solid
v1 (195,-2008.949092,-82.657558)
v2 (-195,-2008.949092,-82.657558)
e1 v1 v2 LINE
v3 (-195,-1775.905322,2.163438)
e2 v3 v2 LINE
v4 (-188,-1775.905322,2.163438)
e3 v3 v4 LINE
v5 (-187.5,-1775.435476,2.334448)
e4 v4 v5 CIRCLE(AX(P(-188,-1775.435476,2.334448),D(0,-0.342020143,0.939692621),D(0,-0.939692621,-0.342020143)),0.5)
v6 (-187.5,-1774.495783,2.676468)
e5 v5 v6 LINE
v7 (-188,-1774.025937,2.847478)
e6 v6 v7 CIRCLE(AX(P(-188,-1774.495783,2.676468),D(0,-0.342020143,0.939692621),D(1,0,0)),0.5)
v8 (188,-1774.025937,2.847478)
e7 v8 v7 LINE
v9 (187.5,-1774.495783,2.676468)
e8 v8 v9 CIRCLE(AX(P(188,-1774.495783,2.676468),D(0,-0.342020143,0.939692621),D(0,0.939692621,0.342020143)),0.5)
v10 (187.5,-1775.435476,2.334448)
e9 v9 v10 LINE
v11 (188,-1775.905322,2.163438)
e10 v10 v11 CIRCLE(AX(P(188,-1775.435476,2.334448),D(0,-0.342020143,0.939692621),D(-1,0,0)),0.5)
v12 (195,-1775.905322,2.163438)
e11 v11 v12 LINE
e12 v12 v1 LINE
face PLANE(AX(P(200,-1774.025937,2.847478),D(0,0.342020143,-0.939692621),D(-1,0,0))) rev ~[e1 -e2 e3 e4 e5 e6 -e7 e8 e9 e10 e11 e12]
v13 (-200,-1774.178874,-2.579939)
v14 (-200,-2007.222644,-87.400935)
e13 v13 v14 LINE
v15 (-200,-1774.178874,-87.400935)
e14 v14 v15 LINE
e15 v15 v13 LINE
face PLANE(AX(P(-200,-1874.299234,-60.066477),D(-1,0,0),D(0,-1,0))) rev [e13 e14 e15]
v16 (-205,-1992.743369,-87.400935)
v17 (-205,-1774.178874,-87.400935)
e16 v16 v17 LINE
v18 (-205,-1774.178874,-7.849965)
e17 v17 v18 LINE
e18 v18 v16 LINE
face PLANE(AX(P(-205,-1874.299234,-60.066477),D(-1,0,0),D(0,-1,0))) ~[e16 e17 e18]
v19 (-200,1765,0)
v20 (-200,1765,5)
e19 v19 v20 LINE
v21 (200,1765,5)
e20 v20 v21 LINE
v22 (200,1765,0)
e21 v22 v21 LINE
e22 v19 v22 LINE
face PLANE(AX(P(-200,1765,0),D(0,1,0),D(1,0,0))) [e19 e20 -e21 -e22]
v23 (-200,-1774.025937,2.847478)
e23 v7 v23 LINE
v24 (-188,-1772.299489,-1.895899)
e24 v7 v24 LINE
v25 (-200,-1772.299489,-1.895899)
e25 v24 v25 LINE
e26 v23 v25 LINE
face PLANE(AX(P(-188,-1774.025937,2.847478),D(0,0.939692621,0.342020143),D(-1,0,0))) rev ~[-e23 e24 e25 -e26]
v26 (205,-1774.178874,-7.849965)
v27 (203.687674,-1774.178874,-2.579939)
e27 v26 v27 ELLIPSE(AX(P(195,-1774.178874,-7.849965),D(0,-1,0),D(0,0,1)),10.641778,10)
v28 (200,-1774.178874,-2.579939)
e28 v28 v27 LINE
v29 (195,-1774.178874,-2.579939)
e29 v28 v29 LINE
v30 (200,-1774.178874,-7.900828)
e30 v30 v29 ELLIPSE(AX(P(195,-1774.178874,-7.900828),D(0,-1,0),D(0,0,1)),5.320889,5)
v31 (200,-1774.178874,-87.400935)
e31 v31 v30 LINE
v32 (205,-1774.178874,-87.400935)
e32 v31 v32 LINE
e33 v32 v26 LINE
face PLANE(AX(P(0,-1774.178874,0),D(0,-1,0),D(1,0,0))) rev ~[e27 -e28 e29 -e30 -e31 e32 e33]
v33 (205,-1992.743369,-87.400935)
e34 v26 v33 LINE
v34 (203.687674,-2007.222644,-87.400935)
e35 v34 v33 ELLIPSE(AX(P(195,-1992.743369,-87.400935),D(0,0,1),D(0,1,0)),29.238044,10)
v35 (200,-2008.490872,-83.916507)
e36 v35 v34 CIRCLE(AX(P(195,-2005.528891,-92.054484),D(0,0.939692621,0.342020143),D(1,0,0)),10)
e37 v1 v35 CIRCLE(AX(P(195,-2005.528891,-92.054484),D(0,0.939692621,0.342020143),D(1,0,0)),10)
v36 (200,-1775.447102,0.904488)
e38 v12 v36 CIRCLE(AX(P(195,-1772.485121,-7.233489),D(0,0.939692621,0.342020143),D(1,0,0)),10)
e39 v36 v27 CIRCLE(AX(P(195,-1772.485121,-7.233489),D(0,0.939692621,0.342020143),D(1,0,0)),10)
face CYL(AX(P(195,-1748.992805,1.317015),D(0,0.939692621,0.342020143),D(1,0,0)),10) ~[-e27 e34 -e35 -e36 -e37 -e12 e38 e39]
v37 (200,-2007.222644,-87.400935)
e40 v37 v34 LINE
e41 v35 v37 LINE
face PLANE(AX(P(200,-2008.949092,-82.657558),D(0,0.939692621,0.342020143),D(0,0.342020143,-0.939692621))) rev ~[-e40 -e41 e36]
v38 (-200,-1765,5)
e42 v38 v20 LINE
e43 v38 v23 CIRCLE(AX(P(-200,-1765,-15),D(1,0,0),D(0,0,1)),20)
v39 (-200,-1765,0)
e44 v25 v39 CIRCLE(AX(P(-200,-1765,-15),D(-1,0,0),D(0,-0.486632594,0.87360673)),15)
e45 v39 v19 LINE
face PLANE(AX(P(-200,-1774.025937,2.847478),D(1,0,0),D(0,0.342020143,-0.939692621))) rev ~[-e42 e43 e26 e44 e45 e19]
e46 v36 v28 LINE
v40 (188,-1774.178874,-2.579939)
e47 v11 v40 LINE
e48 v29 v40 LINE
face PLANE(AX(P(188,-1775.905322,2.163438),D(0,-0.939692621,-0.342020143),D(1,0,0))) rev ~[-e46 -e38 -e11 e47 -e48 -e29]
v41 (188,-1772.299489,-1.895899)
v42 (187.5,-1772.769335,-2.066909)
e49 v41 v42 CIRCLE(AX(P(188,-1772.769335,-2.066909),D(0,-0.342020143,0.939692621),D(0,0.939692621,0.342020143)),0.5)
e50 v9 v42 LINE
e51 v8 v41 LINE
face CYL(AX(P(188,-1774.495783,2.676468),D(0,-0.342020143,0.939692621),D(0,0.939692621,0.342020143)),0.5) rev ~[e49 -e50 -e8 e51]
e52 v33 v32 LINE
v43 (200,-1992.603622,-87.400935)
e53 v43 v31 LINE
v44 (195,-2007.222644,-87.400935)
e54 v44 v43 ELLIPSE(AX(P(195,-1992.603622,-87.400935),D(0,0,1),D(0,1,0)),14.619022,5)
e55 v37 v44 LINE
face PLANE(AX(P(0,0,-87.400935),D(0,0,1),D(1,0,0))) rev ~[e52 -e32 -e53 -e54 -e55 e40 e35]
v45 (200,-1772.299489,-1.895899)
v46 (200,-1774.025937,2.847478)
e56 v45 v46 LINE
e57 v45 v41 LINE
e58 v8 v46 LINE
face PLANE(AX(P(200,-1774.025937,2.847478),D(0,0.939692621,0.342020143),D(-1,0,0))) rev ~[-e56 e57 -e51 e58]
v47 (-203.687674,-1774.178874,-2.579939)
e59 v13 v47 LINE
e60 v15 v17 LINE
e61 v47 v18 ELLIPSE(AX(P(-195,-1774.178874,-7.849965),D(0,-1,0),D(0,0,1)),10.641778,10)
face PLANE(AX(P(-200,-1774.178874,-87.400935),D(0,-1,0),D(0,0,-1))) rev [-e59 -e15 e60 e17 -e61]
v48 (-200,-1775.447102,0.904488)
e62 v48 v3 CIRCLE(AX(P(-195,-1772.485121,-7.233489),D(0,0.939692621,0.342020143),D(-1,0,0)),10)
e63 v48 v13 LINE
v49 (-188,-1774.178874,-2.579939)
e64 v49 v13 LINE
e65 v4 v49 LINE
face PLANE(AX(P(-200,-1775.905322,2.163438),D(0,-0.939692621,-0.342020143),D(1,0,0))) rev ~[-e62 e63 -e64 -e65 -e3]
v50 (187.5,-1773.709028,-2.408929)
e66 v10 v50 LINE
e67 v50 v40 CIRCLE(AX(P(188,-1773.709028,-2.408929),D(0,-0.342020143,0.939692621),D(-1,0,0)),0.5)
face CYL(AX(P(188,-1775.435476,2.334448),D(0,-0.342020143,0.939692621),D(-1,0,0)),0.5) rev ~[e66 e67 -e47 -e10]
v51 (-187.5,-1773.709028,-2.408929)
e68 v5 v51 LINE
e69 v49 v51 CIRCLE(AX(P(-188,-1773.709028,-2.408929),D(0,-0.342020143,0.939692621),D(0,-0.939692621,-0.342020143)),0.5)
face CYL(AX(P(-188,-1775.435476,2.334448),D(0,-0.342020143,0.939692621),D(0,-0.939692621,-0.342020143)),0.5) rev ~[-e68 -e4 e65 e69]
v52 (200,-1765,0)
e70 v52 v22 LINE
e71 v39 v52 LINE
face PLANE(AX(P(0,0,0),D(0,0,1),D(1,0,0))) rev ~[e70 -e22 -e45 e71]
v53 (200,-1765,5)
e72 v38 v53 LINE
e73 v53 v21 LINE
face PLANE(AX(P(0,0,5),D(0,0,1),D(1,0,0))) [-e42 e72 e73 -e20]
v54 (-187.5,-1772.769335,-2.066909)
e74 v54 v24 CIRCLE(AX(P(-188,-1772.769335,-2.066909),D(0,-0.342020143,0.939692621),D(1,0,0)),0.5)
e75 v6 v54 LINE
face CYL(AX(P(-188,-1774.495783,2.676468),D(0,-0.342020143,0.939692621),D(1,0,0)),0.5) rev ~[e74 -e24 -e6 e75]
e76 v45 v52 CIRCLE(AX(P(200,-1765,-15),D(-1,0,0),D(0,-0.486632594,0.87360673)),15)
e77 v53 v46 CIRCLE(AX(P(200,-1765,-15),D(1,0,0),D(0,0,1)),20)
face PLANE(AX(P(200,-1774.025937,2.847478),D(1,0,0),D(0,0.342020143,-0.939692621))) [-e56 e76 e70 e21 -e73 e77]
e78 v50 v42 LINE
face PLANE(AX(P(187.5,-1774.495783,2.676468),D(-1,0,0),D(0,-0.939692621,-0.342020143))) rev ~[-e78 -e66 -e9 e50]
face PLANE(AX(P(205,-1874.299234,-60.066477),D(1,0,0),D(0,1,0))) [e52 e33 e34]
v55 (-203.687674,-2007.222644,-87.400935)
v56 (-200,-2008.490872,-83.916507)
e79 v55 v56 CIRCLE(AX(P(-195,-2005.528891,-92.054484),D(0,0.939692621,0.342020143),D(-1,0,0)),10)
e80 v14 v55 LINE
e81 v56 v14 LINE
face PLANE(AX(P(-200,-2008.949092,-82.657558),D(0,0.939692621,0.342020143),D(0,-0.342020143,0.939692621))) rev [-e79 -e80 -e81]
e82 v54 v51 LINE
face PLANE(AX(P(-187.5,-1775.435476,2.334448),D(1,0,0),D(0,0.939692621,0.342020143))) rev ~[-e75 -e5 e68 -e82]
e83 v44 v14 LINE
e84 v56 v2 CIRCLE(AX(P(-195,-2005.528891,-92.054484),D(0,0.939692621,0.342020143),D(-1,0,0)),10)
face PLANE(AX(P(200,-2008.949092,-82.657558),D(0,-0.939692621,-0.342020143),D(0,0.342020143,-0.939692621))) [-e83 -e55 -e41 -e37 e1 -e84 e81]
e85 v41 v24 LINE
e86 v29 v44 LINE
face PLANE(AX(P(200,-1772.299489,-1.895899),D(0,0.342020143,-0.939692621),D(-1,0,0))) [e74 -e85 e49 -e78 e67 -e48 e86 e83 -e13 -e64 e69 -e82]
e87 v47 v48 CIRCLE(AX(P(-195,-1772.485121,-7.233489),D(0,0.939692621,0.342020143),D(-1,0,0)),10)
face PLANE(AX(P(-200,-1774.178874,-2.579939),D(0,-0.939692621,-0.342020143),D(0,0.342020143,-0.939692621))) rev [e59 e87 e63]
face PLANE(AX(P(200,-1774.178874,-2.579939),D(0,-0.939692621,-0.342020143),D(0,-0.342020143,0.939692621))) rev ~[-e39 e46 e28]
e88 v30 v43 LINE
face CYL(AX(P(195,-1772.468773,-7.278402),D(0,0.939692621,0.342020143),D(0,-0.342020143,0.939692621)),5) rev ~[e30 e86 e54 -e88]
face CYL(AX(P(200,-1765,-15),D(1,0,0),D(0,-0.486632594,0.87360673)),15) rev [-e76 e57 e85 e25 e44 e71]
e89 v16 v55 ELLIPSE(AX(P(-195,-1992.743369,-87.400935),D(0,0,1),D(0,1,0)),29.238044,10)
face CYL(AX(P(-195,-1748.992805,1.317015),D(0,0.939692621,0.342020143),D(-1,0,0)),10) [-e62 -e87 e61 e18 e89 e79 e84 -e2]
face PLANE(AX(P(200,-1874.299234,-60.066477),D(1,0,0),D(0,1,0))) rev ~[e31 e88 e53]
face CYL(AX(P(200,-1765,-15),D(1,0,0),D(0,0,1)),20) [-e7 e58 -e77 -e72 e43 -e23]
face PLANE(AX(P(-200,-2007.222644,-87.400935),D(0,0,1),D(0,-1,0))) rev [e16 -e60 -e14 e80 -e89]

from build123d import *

# Parameters (mm, degrees)
F0_W         = 400
F0_H         = 3530
F1_DEPTH     = 5
F3_DEPTH     = 400
F4_DEPTH     = 250
F6_DEPTH     = 1295.2249255895
F8_DEPTH     = 5
F9_T4_DEPTH  = 298
F9_T9_DEPTH  = 298
F10_T4_DEPTH = 248


# Not quite as in the source:
# - a fillet or chamfer that OpenCascade refuses, or shapes differently, is made with other operations: its cross-section is extruded or revolved along the edge and cut away or added
# - a pattern or mirror of a feature is missing from the dataset's text; its kind, count and spacing are read off the source's solid


with BuildPart() as f1:
    # F0 (on Top) → F1 (new body)
    with BuildSketch(Plane.XY):
        Rectangle(F0_W, F0_H)
    extrude(amount=F1_DEPTH)

    # F2 (on face) → F3 (join, through all)
    with BuildSketch(Plane.YZ.offset(200)):
        with BuildLine():
            Line((-1765, 0), (-1765, 5))
            ThreePointArc((-1765, 5), (-1769.6395282242, 4.4544282326), (-1774.0259368871, 2.8474777857))
            Line((-1774.0259368871, 2.8474777857), (-1772.2994889085, -1.8958990513))
            ThreePointArc((-1772.2994889085, -1.8958990513), (-1768.7708411375, -0.4817095664), (-1765, 0))
        make_face()
    extrude(amount=-F3_DEPTH)

    # F4 (add): a face of the model
    f4_faces = [f1.faces().sort_by_distance(p)[0] for p in [
        (0, -1773.1627128978, 0.4757893672),
    ]]
    extrude(f4_faces, amount=F4_DEPTH)

    # F5 (on face) → F6 (cut, through all)
    with BuildSketch(Plane(origin=(0, -208.4367747126, 572.6753319069), x_dir=(1, 0, 0), z_dir=(0, -0.3420201433, 0.9396926208))):
        with BuildLine():
            Line((200, -1668.0651872152), (200, -1666.0651872152))
            Line((200, -1666.0651872152), (188, -1666.0651872152))
            ThreePointArc((188, -1666.0651872152), (187.6464466094, -1666.2116338246), (187.5, -1666.5651872152))
            Line((187.5, -1666.5651872152), (187.5, -1667.5651872152))
            ThreePointArc((187.5, -1667.5651872152), (187.6464466094, -1667.9187406058), (188, -1668.0651872152))
            Line((188, -1668.0651872152), (200, -1668.0651872152))
        make_face()
        with BuildLine():
            ThreePointArc((-188, -1668.0651872152), (-187.6464466094, -1667.9187406058), (-187.5, -1667.5651872152))
            Line((-187.5, -1667.5651872152), (-187.5, -1666.5651872152))
            ThreePointArc((-187.5, -1666.5651872152), (-187.6464466094, -1666.2116338246), (-188, -1666.0651872152))
            Line((-188, -1666.0651872152), (-200, -1666.0651872152))
            Line((-200, -1666.0651872152), (-200, -1668.0651872152))
            Line((-200, -1668.0651872152), (-188, -1668.0651872152))
        make_face()
    extrude(amount=-F6_DEPTH, mode=Mode.SUBTRACT)

    # F7 (on face) → F8 (join)
    with BuildSketch(Plane.YZ.offset(200)):
        Polygon((-1775.9053221286, 2.163437499), (-2008.9490920835, -82.6575580457), (-2007.222644105, -87.4009348827), (-1774.1788741501, -87.4009348827), (-1774.1788741501, -2.5799393379), align=None)
    f8 = extrude(amount=F8_DEPTH)

    # F8_copies: F8 across plane
    add(f8.mirror(Plane(origin=(0, 0, 0), x_dir=(0, 0, -1), z_dir=(-1, 0, 0))))

    # F9: fillet of radius 10 on 2 edges, made by hand


with BuildPart() as f9_tool2:
    # F9_s3 → F9_t4 (new body)
    with BuildSketch(Plane(origin=(0, -1543.9762318963, -561.9613908248), x_dir=(1, 0, 0), z_dir=(0, -0.9396926208, -0.3420201433))):
        with BuildLine():
            ThreePointArc((205, 599.4283590606), (202.0710678119, 606.4994268725), (195, 609.4283590606))
            Line((195, 609.4283590606), (205, 609.4283590606))
            Line((205, 609.4283590606), (205, 599.4283590606))
        make_face()
    extrude(amount=F9_T4_DEPTH)

    split(bisect_by=Plane(origin=(0, -1565.5891621744, -569.8278541213), x_dir=(1, 0, 0), z_dir=(0, -0.9396926208, -0.3420201433)), keep=Keep.TOP)


with BuildPart() as f1_1:
    add(f1.part)

    # F9_t1: cut F9_tool2
    add(f9_tool2.part, mode=Mode.SUBTRACT)


with BuildPart() as f9_tool7:
    # F9_s8 → F9_t9 (new body)
    with BuildSketch(Plane(origin=(0, -1543.9762318963, -561.9613908248), x_dir=(1, 0, 0), z_dir=(0, -0.9396926208, -0.3420201433))):
        with BuildLine():
            ThreePointArc((-205, 599.4283590606), (-202.0710678119, 606.4994268725), (-195, 609.4283590606))
            Line((-195, 609.4283590606), (-205, 609.4283590606))
            Line((-205, 609.4283590606), (-205, 599.4283590606))
        make_face()
    extrude(amount=F9_T9_DEPTH)

    split(bisect_by=Plane.XZ.offset(1774.1788741501), keep=Keep.TOP)


with BuildPart() as f1_2:
    add(f1_1.part)

    # F9_t6: cut F9_tool7
    add(f9_tool7.part, mode=Mode.SUBTRACT)

    # F10: fillet of radius 5 on 1 edges, made by hand


with BuildPart() as f10_tool2:
    # F10_s3 → F10_t4 (new body)
    with BuildSketch(Plane(origin=(0, -1567.468547416, -570.5118944079), x_dir=(1, 0, 0), z_dir=(0, -0.9396926208, -0.3420201433))):
        with BuildLine():
            ThreePointArc((195, 604.3805628643), (198.5355339059, 602.9160967702), (200, 599.3805628643))
            Line((200, 599.3805628643), (200, 604.3805628643))
            Line((200, 604.3805628643), (195, 604.3805628643))
        make_face()
    extrude(amount=F10_T4_DEPTH)

    split(bisect_by=Plane.XZ.offset(1774.1788741501), keep=Keep.TOP)

    split(bisect_by=Plane.XY.offset(-87.4009348827), keep=Keep.TOP)


with BuildPart() as f1_3:
    add(f1_2.part)

    # F10_t1: union F10_tool2
    add(f10_tool2.part)


solid = f1_3.part
